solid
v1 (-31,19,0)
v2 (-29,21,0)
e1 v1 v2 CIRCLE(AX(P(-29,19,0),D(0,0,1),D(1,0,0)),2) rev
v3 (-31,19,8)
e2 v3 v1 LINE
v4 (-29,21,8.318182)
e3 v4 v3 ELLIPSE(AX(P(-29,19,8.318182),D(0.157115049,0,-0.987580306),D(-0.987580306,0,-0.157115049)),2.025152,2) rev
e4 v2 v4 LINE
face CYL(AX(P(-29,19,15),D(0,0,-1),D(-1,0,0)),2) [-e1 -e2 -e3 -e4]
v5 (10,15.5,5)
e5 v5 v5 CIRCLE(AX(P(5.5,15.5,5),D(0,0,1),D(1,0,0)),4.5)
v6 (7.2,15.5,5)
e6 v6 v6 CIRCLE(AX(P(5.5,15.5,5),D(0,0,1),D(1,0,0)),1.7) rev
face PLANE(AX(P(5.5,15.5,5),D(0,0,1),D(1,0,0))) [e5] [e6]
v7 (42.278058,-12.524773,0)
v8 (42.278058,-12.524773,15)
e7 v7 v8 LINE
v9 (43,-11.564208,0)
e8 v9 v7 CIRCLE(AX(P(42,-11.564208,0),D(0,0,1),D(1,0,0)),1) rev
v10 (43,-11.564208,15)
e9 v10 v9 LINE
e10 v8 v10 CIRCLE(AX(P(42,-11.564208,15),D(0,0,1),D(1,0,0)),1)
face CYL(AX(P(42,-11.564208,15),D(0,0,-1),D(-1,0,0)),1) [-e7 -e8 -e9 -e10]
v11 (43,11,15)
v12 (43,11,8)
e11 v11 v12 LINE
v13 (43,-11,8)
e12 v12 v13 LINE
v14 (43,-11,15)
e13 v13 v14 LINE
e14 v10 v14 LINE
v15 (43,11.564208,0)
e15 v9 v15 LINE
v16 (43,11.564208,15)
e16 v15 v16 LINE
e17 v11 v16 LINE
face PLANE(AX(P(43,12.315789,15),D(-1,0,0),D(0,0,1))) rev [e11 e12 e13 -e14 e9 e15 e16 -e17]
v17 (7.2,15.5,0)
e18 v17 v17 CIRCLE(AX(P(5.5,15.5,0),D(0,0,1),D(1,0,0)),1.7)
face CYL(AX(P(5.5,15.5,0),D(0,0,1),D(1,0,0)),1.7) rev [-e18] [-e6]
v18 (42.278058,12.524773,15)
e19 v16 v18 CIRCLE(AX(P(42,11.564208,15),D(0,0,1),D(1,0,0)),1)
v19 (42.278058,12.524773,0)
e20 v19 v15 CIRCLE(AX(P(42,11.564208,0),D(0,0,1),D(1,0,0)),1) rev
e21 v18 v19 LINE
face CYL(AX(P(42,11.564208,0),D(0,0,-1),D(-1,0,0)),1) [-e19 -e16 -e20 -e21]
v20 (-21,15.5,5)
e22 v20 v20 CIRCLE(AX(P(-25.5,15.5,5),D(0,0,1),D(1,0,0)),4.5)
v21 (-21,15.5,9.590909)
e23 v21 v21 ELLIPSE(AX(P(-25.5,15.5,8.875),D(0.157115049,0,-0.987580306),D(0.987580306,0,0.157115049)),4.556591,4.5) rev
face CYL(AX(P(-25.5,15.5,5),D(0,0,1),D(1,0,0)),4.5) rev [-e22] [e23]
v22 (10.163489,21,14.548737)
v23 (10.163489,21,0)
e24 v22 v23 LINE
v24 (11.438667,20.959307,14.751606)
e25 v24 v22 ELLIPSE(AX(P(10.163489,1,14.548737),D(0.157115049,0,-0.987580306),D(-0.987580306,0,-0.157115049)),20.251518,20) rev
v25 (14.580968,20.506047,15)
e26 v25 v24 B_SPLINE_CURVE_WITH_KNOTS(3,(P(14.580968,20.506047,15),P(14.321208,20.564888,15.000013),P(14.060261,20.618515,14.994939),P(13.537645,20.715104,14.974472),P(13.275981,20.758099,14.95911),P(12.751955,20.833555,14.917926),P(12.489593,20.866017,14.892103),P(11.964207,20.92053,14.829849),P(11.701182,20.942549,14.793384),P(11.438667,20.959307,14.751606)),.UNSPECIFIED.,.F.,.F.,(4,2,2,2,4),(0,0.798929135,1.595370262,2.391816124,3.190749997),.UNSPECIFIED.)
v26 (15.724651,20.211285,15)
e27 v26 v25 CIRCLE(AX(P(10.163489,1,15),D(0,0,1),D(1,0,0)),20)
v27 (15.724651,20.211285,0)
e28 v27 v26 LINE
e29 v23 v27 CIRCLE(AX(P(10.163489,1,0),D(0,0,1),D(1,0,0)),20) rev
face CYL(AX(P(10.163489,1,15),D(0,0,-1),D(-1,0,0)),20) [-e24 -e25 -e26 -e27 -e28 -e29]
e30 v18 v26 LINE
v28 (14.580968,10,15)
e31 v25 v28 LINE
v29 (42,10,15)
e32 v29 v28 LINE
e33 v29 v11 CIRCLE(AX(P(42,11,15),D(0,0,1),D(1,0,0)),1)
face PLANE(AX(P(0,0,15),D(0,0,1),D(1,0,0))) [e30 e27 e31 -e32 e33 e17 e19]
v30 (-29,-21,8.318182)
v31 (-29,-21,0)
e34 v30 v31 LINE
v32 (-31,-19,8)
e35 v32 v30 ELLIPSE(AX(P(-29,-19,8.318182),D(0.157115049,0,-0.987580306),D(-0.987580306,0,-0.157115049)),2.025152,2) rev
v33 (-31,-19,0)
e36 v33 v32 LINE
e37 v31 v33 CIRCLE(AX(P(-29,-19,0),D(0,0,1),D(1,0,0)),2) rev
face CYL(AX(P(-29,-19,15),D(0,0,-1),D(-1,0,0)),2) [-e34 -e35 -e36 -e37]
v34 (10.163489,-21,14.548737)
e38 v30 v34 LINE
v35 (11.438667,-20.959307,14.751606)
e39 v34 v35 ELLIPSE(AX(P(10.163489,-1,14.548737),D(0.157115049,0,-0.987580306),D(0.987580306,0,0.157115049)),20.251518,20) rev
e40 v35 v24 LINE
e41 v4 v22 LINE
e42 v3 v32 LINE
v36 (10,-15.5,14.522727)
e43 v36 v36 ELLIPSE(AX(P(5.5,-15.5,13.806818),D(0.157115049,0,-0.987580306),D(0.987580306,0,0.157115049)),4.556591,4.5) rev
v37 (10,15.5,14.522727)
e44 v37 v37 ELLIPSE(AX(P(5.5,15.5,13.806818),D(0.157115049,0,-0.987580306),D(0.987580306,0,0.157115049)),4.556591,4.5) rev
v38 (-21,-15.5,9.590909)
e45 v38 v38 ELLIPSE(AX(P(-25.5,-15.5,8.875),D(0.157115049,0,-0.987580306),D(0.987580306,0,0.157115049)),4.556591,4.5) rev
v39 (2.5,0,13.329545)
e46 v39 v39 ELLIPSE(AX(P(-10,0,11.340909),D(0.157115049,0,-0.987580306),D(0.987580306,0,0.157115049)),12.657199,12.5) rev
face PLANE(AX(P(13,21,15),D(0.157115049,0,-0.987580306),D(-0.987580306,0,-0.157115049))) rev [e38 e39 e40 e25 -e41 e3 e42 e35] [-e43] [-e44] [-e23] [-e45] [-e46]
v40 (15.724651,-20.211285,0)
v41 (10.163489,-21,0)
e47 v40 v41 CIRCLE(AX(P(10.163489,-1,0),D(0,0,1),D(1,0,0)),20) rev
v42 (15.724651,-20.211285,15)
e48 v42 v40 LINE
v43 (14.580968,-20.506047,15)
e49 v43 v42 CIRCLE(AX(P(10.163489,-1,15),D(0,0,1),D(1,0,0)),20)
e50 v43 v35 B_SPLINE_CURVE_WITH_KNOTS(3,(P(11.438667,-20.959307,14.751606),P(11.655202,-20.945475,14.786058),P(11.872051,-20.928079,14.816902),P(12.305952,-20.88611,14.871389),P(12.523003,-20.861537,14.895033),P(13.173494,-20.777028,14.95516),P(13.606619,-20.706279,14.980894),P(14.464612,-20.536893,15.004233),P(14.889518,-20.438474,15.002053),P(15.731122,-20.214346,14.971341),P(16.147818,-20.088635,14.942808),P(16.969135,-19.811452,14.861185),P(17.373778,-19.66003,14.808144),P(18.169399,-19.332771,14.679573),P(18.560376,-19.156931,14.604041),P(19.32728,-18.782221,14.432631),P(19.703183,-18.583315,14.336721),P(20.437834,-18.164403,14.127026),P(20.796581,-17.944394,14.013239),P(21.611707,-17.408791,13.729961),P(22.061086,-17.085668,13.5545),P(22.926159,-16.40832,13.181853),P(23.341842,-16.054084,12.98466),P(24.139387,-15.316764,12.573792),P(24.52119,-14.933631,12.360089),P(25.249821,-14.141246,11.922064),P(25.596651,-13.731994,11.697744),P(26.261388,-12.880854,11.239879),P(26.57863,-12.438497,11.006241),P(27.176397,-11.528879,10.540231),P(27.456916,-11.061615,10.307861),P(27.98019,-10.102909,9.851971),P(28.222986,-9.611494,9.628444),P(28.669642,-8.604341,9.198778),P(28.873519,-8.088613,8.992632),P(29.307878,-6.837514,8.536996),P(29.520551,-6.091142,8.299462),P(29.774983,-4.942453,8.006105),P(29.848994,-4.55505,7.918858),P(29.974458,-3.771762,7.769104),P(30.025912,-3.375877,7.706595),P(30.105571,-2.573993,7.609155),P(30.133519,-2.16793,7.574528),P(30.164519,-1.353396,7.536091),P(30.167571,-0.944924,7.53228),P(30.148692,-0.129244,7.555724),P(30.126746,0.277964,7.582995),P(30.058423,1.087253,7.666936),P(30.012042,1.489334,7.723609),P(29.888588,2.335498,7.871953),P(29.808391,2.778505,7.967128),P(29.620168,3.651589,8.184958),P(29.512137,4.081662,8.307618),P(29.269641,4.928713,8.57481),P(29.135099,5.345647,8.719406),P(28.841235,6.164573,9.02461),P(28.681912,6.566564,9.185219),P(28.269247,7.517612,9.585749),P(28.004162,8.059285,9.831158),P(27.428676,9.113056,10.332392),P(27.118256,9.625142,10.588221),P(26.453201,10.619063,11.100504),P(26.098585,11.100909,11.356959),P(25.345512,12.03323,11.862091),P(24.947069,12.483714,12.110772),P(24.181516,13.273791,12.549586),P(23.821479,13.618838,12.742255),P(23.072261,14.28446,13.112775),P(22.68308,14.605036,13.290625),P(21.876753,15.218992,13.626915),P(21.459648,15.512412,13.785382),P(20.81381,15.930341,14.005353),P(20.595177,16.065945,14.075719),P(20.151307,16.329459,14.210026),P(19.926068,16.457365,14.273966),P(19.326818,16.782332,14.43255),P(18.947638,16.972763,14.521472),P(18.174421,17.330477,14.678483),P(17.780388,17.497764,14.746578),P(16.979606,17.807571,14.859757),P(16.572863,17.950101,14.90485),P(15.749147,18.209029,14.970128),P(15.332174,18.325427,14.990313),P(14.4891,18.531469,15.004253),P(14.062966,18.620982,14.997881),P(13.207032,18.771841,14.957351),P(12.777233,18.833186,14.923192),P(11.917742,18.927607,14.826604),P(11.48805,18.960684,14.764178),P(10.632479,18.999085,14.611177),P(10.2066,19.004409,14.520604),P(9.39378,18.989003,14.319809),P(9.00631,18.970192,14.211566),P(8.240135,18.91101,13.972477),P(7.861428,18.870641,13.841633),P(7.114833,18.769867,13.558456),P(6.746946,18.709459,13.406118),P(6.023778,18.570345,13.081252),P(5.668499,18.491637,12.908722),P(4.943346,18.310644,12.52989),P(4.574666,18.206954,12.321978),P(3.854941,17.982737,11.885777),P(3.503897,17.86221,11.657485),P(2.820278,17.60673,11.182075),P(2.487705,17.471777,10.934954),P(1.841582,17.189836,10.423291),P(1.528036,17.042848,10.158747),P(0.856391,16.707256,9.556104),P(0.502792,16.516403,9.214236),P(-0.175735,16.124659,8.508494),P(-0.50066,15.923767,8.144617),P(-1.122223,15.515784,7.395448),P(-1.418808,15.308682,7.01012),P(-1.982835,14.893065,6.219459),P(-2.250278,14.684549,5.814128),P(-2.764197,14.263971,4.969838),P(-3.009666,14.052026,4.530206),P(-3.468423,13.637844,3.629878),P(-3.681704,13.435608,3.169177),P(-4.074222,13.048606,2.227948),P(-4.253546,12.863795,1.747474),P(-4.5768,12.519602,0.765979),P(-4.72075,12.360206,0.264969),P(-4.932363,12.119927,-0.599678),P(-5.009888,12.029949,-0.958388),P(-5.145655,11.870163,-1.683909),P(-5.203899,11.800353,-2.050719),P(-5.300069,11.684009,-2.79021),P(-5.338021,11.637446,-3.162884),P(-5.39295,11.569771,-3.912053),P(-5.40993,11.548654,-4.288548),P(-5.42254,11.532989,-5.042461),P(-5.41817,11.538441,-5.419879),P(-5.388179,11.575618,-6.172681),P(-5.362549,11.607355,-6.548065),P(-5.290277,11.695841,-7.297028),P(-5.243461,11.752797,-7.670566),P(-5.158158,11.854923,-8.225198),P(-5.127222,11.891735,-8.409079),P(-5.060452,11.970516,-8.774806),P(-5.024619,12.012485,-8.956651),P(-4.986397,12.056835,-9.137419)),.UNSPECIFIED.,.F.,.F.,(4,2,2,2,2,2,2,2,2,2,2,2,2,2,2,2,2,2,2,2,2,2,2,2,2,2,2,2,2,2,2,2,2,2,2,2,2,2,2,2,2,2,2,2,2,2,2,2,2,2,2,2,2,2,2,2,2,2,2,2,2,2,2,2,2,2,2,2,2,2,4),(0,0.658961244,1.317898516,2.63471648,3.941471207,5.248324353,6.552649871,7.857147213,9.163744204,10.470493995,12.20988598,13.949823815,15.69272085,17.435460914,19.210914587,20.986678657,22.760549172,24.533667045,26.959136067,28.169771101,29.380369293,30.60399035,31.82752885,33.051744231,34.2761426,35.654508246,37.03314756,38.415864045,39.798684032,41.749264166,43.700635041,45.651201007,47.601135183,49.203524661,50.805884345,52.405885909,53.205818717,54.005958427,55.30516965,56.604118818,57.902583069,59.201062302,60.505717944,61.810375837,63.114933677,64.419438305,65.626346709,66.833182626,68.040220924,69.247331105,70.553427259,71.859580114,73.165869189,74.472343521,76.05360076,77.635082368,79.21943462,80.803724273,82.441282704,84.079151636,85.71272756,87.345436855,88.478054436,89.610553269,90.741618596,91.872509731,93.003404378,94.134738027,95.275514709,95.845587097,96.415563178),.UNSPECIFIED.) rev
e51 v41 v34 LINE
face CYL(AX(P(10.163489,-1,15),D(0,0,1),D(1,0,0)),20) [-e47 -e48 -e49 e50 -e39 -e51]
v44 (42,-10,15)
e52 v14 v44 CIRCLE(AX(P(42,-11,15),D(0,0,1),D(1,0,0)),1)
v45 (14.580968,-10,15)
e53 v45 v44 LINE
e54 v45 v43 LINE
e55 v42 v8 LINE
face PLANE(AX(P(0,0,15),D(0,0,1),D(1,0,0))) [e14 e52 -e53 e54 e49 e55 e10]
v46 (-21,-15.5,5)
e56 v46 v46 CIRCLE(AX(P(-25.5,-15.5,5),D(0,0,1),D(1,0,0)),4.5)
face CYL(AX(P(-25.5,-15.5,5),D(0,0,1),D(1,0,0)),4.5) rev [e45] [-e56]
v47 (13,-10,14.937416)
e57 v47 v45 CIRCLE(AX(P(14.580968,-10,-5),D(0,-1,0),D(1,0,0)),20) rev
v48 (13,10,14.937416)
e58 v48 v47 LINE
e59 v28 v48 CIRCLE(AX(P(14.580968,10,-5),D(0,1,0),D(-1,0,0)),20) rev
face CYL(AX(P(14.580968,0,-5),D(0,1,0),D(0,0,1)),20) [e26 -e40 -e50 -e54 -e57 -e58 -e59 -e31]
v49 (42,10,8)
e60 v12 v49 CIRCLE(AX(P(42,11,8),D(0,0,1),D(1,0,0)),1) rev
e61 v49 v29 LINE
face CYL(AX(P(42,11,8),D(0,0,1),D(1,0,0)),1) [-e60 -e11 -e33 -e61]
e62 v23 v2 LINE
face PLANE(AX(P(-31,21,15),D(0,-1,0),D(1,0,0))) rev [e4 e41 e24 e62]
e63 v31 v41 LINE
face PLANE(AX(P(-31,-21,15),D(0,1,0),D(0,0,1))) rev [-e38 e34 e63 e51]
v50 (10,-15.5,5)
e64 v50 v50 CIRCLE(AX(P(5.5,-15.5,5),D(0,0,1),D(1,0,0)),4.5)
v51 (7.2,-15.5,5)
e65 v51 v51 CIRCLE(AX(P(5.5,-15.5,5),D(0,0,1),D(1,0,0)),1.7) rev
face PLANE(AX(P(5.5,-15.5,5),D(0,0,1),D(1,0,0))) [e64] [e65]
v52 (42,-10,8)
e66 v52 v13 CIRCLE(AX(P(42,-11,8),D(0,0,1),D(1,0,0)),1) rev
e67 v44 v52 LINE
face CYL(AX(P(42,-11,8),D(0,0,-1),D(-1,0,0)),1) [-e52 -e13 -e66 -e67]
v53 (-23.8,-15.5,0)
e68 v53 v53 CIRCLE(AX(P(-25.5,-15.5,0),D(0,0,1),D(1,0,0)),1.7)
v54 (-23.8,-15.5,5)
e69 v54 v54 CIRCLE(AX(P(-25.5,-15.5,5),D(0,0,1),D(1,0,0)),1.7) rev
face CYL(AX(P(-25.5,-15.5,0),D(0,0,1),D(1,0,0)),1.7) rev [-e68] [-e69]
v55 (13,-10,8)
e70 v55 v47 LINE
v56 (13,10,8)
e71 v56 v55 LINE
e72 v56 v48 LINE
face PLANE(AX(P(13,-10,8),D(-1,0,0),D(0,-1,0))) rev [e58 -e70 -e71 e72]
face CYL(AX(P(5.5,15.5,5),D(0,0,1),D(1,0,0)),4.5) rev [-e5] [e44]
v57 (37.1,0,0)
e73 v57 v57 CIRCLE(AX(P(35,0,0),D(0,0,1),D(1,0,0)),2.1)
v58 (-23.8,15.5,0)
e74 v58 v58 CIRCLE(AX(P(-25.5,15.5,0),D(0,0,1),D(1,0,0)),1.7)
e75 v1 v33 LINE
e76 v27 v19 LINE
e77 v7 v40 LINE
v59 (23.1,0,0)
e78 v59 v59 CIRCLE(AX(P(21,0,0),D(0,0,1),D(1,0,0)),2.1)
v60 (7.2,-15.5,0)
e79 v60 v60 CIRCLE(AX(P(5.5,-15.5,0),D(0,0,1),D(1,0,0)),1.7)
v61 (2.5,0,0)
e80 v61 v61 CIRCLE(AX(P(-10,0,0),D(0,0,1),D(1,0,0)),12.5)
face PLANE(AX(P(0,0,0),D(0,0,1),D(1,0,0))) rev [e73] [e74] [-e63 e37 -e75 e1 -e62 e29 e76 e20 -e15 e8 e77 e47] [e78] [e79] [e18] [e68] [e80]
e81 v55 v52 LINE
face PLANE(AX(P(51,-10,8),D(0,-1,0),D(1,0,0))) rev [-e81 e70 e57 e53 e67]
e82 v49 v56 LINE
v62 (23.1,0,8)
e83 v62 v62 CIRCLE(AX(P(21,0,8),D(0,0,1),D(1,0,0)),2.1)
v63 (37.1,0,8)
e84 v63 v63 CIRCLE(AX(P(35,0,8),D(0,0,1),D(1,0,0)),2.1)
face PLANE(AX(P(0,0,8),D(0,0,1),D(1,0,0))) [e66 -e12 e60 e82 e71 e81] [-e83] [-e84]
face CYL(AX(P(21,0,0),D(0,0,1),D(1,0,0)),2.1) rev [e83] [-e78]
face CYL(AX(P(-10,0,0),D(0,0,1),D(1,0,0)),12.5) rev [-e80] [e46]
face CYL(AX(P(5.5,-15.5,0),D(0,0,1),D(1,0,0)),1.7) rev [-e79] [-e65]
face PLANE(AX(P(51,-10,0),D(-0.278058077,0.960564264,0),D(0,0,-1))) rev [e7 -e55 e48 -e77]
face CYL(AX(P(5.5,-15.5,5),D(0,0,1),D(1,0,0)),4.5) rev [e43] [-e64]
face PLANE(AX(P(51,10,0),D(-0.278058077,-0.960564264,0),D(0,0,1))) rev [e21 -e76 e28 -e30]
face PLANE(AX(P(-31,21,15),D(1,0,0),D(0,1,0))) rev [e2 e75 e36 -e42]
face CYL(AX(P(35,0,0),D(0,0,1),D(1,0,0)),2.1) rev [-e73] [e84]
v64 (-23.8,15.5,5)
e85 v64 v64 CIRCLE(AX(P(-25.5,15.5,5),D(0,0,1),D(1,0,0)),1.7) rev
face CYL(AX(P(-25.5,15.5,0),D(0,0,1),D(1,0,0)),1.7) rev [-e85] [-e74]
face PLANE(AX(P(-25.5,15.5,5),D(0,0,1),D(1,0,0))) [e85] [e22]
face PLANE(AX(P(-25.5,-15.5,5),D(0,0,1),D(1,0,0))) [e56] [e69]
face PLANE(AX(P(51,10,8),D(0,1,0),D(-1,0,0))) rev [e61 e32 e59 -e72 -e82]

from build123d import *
from OCP.BRepFilletAPI import BRepFilletAPI_MakeChamfer

# Parameters (mm, degrees)
ESQUISSE1_W             = 62
ESQUISSE1_H             = 42
BOSS_EXTRU_1_DEPTH      = 15
ESQUISSE2_R             = 2.1
ESQUISSE2_R_2           = 12.5
ESQUISSE2_R_3           = 1.7
ENL_V_MAT_EXTRU_1_DEPTH = 41.33608806
ESQUISSE4_R             = 4.5
ENL_V_MAT_EXTRU_2_DEPTH = 10
SKETCH1_W               = 20
SKETCH1_H               = 42
CUT_EXTRUDE1_DEPTH      = 41.33608806
SKETCH2_W               = 15
SKETCH2_H               = 42
BOSS_EXTRUDE1_DEPTH     = 40
CUT_EXTRUDE2_DEPTH      = 68.749538744
SKETCH7_W               = 38
SKETCH7_H               = 20
CUT_EXTRUDE3_DEPTH      = 7
SKETCH9_R               = 2.1
CUT_EXTRUDE4_DEPTH      = 56.731499172
CHAMFER1_SIZE           = 38
CHAMFER1_SIZE2          = 11
SKETCH10_W              = 8
SKETCH10_H              = 24.631578948
CUT_EXTRUDE5_DEPTH      = 58.15767665
FILLET2_START           = -1
FILLET2_DEPTH           = 17
FILLET2_START_2         = -22
FILLET2_2_DEPTH         = 44
FILLET4_R               = 2
FILLET5_R               = 1


with BuildPart() as part:
    # Esquisse1 → Boss.-Extru.1 (new body)
    with BuildSketch(Plane.XY):
        Rectangle(ESQUISSE1_W, ESQUISSE1_H)
    extrude(amount=BOSS_EXTRU_1_DEPTH)

    # Esquisse2 → Enlèv. mat.-Extru.1 (cut, through all)
    with BuildSketch(Plane.XY.offset(15)):
        with Locations((21, 11)):
            Circle(ESQUISSE2_R)
        with Locations((21, -11)):
            Circle(ESQUISSE2_R)
        with Locations((-10, 0)):
            Circle(ESQUISSE2_R_2)
        with Locations((-25.5, 15.5)):
            Circle(ESQUISSE2_R_3)
        with Locations((5.5, 15.5)):
            Circle(ESQUISSE2_R_3)
        with Locations((5.5, -15.5)):
            Circle(ESQUISSE2_R_3)
        with Locations((-25.5, -15.5)):
            Circle(ESQUISSE2_R_3)
    extrude(amount=-ENL_V_MAT_EXTRU_1_DEPTH, mode=Mode.SUBTRACT)

    # Esquisse4 → Enlèv. mat.-Extru.2 (cut)
    with BuildSketch(Plane.XY.offset(15)):
        with Locations((-25.5, 15.5)):
            Circle(ESQUISSE4_R)
        with Locations((-25.5, -15.5)):
            Circle(ESQUISSE4_R)
        with Locations((5.5, -15.5)):
            Circle(ESQUISSE4_R)
        with Locations((5.5, 15.5)):
            Circle(ESQUISSE4_R)
    extrude(amount=-ENL_V_MAT_EXTRU_2_DEPTH, mode=Mode.SUBTRACT)

    # Sketch1 → Cut-Extrude1 (cut, through all)
    with BuildSketch(Plane.XY.offset(15)):
        with Locations((21, 0)):
            Rectangle(SKETCH1_W, SKETCH1_H)
    extrude(amount=-CUT_EXTRUDE1_DEPTH, mode=Mode.SUBTRACT)

    # Sketch2 → Boss-Extrude1 (add)
    with BuildSketch(Plane(origin=(11, 0, 0), x_dir=(0, 0, -1), z_dir=(1, 0, 0))):
        with Locations((-7.5, 0)):
            Rectangle(SKETCH2_W, SKETCH2_H)
    extrude(amount=BOSS_EXTRUDE1_DEPTH)

    # Sketch6 → Cut-Extrude2 (cut, through all)
    with BuildSketch(Plane.XZ.offset(21)):
        Polygon((-31, 8), (-31, 15), (13, 15), align=None)
    extrude(amount=-CUT_EXTRUDE2_DEPTH, mode=Mode.SUBTRACT)

    # Sketch7 → Cut-Extrude3 (cut)
    with BuildSketch(Plane.XY.offset(15)):
        with Locations((32, 0)):
            Rectangle(SKETCH7_W, SKETCH7_H)
    extrude(amount=-CUT_EXTRUDE3_DEPTH, mode=Mode.SUBTRACT)

    # Sketch9 → Cut-Extrude4 (cut, through all)
    with BuildSketch(Plane.XY.offset(8)):
        with Locations((21, 0)):
            Circle(SKETCH9_R)
        with Locations((35, 0)):
            Circle(SKETCH9_R)
    extrude(amount=-CUT_EXTRUDE4_DEPTH, mode=Mode.SUBTRACT)

    # Chamfer1: one chamfer whose edges measure the first distance from different faces: ONE call of the kernel's chamfer builder (chamfer() names one face for all edges)
    chamfer1_edges_1 = [part.edges().sort_by_distance(p)[0] for p in [
        (51, 21, 7.5),
    ]]
    chamfer1_side_1 = [part.faces().sort_by_distance(p)[0] for p in [
        (13.76889715, 21, 6.760532838),
    ]]
    chamfer1_edges_2 = [part.edges().sort_by_distance(p)[0] for p in [
        (51, -21, 7.5),
    ]]
    chamfer1_side_2 = [part.faces().sort_by_distance(p)[0] for p in [
        (13.76889715, -21, 6.760532838),
    ]]
    chamfer1 = BRepFilletAPI_MakeChamfer(part.part.solid().wrapped)
    for e in chamfer1_edges_1:
        chamfer1.Add(CHAMFER1_SIZE, CHAMFER1_SIZE2, e.wrapped, chamfer1_side_1[0].wrapped)  # the first distance lies on this face
    for e in chamfer1_edges_2:
        chamfer1.Add(CHAMFER1_SIZE, CHAMFER1_SIZE2, e.wrapped, chamfer1_side_2[0].wrapped)  # the first distance lies on this face
    add(Compound.cast(chamfer1.Shape()), mode=Mode.REPLACE)

    # Sketch10 → Cut-Extrude5 (cut, through all)
    with BuildSketch(Plane(origin=(0, 0, 0), x_dir=(-1, 0, 0), z_dir=(0, 0, -1))):
        with Locations((-47, 0)):
            Rectangle(SKETCH10_W, SKETCH10_H)
    extrude(amount=-CUT_EXTRUDE5_DEPTH, mode=Mode.SUBTRACT)

    # Fillet2: read off the stored shape, not the designer's step
    # Fillet2 outline → Fillet2 (cut)
    with BuildSketch(Plane.XY.offset(FILLET2_START)):
        with BuildLine():
            Line((13, 21), (10.163489291, 21))
            ThreePointArc((10.163489291, 21), (12.9718958, 20.801839634), (15.724650822, 20.211285288))
            Line((15.724650822, 20.211285288), (13, 21))
        make_face()
        with BuildLine():
            ThreePointArc((15.724650822, -20.211285288), (12.9718958, -20.801839634), (10.163489291, -21))
            Line((10.163489291, -21), (13, -21))
            Line((13, -21), (15.724650822, -20.211285288))
        make_face()
    extrude(amount=FILLET2_DEPTH, mode=Mode.SUBTRACT)

    # Fillet2 2 outline → Fillet2 2 (cut)
    with BuildSketch(Plane(origin=(0, 0, 0), x_dir=(1, 0, 0), z_dir=(0, 1, 0)).offset(FILLET2_START_2)):
        with BuildLine():
            Line((11.438667082, -14.751606127), (13, -15))
            Line((13, -15), (14.580968057, -15))
            ThreePointArc((14.580968057, -15), (13.004916429, -14.937804826), (11.438667082, -14.751606127))
        make_face()
    extrude(amount=FILLET2_2_DEPTH, mode=Mode.SUBTRACT)

    # Fillet4
    fillet4_edges = [part.edges().sort_by_distance(p)[0] for p in [
        (-31, 21, 4),
        (-31, -21, 4),
    ]]
    fillet(fillet4_edges, radius=FILLET4_R)

    # Fillet5
    fillet5_edges = [part.edges().sort_by_distance(p)[0] for p in [
        (43, -10, 11.5),
        (43, 10, 11.5),
        (43, 12.315789474, 7.5),
        (43, -12.315789474, 7.5),
    ]]
    fillet(fillet5_edges, radius=FILLET5_R)


solid = part.part
